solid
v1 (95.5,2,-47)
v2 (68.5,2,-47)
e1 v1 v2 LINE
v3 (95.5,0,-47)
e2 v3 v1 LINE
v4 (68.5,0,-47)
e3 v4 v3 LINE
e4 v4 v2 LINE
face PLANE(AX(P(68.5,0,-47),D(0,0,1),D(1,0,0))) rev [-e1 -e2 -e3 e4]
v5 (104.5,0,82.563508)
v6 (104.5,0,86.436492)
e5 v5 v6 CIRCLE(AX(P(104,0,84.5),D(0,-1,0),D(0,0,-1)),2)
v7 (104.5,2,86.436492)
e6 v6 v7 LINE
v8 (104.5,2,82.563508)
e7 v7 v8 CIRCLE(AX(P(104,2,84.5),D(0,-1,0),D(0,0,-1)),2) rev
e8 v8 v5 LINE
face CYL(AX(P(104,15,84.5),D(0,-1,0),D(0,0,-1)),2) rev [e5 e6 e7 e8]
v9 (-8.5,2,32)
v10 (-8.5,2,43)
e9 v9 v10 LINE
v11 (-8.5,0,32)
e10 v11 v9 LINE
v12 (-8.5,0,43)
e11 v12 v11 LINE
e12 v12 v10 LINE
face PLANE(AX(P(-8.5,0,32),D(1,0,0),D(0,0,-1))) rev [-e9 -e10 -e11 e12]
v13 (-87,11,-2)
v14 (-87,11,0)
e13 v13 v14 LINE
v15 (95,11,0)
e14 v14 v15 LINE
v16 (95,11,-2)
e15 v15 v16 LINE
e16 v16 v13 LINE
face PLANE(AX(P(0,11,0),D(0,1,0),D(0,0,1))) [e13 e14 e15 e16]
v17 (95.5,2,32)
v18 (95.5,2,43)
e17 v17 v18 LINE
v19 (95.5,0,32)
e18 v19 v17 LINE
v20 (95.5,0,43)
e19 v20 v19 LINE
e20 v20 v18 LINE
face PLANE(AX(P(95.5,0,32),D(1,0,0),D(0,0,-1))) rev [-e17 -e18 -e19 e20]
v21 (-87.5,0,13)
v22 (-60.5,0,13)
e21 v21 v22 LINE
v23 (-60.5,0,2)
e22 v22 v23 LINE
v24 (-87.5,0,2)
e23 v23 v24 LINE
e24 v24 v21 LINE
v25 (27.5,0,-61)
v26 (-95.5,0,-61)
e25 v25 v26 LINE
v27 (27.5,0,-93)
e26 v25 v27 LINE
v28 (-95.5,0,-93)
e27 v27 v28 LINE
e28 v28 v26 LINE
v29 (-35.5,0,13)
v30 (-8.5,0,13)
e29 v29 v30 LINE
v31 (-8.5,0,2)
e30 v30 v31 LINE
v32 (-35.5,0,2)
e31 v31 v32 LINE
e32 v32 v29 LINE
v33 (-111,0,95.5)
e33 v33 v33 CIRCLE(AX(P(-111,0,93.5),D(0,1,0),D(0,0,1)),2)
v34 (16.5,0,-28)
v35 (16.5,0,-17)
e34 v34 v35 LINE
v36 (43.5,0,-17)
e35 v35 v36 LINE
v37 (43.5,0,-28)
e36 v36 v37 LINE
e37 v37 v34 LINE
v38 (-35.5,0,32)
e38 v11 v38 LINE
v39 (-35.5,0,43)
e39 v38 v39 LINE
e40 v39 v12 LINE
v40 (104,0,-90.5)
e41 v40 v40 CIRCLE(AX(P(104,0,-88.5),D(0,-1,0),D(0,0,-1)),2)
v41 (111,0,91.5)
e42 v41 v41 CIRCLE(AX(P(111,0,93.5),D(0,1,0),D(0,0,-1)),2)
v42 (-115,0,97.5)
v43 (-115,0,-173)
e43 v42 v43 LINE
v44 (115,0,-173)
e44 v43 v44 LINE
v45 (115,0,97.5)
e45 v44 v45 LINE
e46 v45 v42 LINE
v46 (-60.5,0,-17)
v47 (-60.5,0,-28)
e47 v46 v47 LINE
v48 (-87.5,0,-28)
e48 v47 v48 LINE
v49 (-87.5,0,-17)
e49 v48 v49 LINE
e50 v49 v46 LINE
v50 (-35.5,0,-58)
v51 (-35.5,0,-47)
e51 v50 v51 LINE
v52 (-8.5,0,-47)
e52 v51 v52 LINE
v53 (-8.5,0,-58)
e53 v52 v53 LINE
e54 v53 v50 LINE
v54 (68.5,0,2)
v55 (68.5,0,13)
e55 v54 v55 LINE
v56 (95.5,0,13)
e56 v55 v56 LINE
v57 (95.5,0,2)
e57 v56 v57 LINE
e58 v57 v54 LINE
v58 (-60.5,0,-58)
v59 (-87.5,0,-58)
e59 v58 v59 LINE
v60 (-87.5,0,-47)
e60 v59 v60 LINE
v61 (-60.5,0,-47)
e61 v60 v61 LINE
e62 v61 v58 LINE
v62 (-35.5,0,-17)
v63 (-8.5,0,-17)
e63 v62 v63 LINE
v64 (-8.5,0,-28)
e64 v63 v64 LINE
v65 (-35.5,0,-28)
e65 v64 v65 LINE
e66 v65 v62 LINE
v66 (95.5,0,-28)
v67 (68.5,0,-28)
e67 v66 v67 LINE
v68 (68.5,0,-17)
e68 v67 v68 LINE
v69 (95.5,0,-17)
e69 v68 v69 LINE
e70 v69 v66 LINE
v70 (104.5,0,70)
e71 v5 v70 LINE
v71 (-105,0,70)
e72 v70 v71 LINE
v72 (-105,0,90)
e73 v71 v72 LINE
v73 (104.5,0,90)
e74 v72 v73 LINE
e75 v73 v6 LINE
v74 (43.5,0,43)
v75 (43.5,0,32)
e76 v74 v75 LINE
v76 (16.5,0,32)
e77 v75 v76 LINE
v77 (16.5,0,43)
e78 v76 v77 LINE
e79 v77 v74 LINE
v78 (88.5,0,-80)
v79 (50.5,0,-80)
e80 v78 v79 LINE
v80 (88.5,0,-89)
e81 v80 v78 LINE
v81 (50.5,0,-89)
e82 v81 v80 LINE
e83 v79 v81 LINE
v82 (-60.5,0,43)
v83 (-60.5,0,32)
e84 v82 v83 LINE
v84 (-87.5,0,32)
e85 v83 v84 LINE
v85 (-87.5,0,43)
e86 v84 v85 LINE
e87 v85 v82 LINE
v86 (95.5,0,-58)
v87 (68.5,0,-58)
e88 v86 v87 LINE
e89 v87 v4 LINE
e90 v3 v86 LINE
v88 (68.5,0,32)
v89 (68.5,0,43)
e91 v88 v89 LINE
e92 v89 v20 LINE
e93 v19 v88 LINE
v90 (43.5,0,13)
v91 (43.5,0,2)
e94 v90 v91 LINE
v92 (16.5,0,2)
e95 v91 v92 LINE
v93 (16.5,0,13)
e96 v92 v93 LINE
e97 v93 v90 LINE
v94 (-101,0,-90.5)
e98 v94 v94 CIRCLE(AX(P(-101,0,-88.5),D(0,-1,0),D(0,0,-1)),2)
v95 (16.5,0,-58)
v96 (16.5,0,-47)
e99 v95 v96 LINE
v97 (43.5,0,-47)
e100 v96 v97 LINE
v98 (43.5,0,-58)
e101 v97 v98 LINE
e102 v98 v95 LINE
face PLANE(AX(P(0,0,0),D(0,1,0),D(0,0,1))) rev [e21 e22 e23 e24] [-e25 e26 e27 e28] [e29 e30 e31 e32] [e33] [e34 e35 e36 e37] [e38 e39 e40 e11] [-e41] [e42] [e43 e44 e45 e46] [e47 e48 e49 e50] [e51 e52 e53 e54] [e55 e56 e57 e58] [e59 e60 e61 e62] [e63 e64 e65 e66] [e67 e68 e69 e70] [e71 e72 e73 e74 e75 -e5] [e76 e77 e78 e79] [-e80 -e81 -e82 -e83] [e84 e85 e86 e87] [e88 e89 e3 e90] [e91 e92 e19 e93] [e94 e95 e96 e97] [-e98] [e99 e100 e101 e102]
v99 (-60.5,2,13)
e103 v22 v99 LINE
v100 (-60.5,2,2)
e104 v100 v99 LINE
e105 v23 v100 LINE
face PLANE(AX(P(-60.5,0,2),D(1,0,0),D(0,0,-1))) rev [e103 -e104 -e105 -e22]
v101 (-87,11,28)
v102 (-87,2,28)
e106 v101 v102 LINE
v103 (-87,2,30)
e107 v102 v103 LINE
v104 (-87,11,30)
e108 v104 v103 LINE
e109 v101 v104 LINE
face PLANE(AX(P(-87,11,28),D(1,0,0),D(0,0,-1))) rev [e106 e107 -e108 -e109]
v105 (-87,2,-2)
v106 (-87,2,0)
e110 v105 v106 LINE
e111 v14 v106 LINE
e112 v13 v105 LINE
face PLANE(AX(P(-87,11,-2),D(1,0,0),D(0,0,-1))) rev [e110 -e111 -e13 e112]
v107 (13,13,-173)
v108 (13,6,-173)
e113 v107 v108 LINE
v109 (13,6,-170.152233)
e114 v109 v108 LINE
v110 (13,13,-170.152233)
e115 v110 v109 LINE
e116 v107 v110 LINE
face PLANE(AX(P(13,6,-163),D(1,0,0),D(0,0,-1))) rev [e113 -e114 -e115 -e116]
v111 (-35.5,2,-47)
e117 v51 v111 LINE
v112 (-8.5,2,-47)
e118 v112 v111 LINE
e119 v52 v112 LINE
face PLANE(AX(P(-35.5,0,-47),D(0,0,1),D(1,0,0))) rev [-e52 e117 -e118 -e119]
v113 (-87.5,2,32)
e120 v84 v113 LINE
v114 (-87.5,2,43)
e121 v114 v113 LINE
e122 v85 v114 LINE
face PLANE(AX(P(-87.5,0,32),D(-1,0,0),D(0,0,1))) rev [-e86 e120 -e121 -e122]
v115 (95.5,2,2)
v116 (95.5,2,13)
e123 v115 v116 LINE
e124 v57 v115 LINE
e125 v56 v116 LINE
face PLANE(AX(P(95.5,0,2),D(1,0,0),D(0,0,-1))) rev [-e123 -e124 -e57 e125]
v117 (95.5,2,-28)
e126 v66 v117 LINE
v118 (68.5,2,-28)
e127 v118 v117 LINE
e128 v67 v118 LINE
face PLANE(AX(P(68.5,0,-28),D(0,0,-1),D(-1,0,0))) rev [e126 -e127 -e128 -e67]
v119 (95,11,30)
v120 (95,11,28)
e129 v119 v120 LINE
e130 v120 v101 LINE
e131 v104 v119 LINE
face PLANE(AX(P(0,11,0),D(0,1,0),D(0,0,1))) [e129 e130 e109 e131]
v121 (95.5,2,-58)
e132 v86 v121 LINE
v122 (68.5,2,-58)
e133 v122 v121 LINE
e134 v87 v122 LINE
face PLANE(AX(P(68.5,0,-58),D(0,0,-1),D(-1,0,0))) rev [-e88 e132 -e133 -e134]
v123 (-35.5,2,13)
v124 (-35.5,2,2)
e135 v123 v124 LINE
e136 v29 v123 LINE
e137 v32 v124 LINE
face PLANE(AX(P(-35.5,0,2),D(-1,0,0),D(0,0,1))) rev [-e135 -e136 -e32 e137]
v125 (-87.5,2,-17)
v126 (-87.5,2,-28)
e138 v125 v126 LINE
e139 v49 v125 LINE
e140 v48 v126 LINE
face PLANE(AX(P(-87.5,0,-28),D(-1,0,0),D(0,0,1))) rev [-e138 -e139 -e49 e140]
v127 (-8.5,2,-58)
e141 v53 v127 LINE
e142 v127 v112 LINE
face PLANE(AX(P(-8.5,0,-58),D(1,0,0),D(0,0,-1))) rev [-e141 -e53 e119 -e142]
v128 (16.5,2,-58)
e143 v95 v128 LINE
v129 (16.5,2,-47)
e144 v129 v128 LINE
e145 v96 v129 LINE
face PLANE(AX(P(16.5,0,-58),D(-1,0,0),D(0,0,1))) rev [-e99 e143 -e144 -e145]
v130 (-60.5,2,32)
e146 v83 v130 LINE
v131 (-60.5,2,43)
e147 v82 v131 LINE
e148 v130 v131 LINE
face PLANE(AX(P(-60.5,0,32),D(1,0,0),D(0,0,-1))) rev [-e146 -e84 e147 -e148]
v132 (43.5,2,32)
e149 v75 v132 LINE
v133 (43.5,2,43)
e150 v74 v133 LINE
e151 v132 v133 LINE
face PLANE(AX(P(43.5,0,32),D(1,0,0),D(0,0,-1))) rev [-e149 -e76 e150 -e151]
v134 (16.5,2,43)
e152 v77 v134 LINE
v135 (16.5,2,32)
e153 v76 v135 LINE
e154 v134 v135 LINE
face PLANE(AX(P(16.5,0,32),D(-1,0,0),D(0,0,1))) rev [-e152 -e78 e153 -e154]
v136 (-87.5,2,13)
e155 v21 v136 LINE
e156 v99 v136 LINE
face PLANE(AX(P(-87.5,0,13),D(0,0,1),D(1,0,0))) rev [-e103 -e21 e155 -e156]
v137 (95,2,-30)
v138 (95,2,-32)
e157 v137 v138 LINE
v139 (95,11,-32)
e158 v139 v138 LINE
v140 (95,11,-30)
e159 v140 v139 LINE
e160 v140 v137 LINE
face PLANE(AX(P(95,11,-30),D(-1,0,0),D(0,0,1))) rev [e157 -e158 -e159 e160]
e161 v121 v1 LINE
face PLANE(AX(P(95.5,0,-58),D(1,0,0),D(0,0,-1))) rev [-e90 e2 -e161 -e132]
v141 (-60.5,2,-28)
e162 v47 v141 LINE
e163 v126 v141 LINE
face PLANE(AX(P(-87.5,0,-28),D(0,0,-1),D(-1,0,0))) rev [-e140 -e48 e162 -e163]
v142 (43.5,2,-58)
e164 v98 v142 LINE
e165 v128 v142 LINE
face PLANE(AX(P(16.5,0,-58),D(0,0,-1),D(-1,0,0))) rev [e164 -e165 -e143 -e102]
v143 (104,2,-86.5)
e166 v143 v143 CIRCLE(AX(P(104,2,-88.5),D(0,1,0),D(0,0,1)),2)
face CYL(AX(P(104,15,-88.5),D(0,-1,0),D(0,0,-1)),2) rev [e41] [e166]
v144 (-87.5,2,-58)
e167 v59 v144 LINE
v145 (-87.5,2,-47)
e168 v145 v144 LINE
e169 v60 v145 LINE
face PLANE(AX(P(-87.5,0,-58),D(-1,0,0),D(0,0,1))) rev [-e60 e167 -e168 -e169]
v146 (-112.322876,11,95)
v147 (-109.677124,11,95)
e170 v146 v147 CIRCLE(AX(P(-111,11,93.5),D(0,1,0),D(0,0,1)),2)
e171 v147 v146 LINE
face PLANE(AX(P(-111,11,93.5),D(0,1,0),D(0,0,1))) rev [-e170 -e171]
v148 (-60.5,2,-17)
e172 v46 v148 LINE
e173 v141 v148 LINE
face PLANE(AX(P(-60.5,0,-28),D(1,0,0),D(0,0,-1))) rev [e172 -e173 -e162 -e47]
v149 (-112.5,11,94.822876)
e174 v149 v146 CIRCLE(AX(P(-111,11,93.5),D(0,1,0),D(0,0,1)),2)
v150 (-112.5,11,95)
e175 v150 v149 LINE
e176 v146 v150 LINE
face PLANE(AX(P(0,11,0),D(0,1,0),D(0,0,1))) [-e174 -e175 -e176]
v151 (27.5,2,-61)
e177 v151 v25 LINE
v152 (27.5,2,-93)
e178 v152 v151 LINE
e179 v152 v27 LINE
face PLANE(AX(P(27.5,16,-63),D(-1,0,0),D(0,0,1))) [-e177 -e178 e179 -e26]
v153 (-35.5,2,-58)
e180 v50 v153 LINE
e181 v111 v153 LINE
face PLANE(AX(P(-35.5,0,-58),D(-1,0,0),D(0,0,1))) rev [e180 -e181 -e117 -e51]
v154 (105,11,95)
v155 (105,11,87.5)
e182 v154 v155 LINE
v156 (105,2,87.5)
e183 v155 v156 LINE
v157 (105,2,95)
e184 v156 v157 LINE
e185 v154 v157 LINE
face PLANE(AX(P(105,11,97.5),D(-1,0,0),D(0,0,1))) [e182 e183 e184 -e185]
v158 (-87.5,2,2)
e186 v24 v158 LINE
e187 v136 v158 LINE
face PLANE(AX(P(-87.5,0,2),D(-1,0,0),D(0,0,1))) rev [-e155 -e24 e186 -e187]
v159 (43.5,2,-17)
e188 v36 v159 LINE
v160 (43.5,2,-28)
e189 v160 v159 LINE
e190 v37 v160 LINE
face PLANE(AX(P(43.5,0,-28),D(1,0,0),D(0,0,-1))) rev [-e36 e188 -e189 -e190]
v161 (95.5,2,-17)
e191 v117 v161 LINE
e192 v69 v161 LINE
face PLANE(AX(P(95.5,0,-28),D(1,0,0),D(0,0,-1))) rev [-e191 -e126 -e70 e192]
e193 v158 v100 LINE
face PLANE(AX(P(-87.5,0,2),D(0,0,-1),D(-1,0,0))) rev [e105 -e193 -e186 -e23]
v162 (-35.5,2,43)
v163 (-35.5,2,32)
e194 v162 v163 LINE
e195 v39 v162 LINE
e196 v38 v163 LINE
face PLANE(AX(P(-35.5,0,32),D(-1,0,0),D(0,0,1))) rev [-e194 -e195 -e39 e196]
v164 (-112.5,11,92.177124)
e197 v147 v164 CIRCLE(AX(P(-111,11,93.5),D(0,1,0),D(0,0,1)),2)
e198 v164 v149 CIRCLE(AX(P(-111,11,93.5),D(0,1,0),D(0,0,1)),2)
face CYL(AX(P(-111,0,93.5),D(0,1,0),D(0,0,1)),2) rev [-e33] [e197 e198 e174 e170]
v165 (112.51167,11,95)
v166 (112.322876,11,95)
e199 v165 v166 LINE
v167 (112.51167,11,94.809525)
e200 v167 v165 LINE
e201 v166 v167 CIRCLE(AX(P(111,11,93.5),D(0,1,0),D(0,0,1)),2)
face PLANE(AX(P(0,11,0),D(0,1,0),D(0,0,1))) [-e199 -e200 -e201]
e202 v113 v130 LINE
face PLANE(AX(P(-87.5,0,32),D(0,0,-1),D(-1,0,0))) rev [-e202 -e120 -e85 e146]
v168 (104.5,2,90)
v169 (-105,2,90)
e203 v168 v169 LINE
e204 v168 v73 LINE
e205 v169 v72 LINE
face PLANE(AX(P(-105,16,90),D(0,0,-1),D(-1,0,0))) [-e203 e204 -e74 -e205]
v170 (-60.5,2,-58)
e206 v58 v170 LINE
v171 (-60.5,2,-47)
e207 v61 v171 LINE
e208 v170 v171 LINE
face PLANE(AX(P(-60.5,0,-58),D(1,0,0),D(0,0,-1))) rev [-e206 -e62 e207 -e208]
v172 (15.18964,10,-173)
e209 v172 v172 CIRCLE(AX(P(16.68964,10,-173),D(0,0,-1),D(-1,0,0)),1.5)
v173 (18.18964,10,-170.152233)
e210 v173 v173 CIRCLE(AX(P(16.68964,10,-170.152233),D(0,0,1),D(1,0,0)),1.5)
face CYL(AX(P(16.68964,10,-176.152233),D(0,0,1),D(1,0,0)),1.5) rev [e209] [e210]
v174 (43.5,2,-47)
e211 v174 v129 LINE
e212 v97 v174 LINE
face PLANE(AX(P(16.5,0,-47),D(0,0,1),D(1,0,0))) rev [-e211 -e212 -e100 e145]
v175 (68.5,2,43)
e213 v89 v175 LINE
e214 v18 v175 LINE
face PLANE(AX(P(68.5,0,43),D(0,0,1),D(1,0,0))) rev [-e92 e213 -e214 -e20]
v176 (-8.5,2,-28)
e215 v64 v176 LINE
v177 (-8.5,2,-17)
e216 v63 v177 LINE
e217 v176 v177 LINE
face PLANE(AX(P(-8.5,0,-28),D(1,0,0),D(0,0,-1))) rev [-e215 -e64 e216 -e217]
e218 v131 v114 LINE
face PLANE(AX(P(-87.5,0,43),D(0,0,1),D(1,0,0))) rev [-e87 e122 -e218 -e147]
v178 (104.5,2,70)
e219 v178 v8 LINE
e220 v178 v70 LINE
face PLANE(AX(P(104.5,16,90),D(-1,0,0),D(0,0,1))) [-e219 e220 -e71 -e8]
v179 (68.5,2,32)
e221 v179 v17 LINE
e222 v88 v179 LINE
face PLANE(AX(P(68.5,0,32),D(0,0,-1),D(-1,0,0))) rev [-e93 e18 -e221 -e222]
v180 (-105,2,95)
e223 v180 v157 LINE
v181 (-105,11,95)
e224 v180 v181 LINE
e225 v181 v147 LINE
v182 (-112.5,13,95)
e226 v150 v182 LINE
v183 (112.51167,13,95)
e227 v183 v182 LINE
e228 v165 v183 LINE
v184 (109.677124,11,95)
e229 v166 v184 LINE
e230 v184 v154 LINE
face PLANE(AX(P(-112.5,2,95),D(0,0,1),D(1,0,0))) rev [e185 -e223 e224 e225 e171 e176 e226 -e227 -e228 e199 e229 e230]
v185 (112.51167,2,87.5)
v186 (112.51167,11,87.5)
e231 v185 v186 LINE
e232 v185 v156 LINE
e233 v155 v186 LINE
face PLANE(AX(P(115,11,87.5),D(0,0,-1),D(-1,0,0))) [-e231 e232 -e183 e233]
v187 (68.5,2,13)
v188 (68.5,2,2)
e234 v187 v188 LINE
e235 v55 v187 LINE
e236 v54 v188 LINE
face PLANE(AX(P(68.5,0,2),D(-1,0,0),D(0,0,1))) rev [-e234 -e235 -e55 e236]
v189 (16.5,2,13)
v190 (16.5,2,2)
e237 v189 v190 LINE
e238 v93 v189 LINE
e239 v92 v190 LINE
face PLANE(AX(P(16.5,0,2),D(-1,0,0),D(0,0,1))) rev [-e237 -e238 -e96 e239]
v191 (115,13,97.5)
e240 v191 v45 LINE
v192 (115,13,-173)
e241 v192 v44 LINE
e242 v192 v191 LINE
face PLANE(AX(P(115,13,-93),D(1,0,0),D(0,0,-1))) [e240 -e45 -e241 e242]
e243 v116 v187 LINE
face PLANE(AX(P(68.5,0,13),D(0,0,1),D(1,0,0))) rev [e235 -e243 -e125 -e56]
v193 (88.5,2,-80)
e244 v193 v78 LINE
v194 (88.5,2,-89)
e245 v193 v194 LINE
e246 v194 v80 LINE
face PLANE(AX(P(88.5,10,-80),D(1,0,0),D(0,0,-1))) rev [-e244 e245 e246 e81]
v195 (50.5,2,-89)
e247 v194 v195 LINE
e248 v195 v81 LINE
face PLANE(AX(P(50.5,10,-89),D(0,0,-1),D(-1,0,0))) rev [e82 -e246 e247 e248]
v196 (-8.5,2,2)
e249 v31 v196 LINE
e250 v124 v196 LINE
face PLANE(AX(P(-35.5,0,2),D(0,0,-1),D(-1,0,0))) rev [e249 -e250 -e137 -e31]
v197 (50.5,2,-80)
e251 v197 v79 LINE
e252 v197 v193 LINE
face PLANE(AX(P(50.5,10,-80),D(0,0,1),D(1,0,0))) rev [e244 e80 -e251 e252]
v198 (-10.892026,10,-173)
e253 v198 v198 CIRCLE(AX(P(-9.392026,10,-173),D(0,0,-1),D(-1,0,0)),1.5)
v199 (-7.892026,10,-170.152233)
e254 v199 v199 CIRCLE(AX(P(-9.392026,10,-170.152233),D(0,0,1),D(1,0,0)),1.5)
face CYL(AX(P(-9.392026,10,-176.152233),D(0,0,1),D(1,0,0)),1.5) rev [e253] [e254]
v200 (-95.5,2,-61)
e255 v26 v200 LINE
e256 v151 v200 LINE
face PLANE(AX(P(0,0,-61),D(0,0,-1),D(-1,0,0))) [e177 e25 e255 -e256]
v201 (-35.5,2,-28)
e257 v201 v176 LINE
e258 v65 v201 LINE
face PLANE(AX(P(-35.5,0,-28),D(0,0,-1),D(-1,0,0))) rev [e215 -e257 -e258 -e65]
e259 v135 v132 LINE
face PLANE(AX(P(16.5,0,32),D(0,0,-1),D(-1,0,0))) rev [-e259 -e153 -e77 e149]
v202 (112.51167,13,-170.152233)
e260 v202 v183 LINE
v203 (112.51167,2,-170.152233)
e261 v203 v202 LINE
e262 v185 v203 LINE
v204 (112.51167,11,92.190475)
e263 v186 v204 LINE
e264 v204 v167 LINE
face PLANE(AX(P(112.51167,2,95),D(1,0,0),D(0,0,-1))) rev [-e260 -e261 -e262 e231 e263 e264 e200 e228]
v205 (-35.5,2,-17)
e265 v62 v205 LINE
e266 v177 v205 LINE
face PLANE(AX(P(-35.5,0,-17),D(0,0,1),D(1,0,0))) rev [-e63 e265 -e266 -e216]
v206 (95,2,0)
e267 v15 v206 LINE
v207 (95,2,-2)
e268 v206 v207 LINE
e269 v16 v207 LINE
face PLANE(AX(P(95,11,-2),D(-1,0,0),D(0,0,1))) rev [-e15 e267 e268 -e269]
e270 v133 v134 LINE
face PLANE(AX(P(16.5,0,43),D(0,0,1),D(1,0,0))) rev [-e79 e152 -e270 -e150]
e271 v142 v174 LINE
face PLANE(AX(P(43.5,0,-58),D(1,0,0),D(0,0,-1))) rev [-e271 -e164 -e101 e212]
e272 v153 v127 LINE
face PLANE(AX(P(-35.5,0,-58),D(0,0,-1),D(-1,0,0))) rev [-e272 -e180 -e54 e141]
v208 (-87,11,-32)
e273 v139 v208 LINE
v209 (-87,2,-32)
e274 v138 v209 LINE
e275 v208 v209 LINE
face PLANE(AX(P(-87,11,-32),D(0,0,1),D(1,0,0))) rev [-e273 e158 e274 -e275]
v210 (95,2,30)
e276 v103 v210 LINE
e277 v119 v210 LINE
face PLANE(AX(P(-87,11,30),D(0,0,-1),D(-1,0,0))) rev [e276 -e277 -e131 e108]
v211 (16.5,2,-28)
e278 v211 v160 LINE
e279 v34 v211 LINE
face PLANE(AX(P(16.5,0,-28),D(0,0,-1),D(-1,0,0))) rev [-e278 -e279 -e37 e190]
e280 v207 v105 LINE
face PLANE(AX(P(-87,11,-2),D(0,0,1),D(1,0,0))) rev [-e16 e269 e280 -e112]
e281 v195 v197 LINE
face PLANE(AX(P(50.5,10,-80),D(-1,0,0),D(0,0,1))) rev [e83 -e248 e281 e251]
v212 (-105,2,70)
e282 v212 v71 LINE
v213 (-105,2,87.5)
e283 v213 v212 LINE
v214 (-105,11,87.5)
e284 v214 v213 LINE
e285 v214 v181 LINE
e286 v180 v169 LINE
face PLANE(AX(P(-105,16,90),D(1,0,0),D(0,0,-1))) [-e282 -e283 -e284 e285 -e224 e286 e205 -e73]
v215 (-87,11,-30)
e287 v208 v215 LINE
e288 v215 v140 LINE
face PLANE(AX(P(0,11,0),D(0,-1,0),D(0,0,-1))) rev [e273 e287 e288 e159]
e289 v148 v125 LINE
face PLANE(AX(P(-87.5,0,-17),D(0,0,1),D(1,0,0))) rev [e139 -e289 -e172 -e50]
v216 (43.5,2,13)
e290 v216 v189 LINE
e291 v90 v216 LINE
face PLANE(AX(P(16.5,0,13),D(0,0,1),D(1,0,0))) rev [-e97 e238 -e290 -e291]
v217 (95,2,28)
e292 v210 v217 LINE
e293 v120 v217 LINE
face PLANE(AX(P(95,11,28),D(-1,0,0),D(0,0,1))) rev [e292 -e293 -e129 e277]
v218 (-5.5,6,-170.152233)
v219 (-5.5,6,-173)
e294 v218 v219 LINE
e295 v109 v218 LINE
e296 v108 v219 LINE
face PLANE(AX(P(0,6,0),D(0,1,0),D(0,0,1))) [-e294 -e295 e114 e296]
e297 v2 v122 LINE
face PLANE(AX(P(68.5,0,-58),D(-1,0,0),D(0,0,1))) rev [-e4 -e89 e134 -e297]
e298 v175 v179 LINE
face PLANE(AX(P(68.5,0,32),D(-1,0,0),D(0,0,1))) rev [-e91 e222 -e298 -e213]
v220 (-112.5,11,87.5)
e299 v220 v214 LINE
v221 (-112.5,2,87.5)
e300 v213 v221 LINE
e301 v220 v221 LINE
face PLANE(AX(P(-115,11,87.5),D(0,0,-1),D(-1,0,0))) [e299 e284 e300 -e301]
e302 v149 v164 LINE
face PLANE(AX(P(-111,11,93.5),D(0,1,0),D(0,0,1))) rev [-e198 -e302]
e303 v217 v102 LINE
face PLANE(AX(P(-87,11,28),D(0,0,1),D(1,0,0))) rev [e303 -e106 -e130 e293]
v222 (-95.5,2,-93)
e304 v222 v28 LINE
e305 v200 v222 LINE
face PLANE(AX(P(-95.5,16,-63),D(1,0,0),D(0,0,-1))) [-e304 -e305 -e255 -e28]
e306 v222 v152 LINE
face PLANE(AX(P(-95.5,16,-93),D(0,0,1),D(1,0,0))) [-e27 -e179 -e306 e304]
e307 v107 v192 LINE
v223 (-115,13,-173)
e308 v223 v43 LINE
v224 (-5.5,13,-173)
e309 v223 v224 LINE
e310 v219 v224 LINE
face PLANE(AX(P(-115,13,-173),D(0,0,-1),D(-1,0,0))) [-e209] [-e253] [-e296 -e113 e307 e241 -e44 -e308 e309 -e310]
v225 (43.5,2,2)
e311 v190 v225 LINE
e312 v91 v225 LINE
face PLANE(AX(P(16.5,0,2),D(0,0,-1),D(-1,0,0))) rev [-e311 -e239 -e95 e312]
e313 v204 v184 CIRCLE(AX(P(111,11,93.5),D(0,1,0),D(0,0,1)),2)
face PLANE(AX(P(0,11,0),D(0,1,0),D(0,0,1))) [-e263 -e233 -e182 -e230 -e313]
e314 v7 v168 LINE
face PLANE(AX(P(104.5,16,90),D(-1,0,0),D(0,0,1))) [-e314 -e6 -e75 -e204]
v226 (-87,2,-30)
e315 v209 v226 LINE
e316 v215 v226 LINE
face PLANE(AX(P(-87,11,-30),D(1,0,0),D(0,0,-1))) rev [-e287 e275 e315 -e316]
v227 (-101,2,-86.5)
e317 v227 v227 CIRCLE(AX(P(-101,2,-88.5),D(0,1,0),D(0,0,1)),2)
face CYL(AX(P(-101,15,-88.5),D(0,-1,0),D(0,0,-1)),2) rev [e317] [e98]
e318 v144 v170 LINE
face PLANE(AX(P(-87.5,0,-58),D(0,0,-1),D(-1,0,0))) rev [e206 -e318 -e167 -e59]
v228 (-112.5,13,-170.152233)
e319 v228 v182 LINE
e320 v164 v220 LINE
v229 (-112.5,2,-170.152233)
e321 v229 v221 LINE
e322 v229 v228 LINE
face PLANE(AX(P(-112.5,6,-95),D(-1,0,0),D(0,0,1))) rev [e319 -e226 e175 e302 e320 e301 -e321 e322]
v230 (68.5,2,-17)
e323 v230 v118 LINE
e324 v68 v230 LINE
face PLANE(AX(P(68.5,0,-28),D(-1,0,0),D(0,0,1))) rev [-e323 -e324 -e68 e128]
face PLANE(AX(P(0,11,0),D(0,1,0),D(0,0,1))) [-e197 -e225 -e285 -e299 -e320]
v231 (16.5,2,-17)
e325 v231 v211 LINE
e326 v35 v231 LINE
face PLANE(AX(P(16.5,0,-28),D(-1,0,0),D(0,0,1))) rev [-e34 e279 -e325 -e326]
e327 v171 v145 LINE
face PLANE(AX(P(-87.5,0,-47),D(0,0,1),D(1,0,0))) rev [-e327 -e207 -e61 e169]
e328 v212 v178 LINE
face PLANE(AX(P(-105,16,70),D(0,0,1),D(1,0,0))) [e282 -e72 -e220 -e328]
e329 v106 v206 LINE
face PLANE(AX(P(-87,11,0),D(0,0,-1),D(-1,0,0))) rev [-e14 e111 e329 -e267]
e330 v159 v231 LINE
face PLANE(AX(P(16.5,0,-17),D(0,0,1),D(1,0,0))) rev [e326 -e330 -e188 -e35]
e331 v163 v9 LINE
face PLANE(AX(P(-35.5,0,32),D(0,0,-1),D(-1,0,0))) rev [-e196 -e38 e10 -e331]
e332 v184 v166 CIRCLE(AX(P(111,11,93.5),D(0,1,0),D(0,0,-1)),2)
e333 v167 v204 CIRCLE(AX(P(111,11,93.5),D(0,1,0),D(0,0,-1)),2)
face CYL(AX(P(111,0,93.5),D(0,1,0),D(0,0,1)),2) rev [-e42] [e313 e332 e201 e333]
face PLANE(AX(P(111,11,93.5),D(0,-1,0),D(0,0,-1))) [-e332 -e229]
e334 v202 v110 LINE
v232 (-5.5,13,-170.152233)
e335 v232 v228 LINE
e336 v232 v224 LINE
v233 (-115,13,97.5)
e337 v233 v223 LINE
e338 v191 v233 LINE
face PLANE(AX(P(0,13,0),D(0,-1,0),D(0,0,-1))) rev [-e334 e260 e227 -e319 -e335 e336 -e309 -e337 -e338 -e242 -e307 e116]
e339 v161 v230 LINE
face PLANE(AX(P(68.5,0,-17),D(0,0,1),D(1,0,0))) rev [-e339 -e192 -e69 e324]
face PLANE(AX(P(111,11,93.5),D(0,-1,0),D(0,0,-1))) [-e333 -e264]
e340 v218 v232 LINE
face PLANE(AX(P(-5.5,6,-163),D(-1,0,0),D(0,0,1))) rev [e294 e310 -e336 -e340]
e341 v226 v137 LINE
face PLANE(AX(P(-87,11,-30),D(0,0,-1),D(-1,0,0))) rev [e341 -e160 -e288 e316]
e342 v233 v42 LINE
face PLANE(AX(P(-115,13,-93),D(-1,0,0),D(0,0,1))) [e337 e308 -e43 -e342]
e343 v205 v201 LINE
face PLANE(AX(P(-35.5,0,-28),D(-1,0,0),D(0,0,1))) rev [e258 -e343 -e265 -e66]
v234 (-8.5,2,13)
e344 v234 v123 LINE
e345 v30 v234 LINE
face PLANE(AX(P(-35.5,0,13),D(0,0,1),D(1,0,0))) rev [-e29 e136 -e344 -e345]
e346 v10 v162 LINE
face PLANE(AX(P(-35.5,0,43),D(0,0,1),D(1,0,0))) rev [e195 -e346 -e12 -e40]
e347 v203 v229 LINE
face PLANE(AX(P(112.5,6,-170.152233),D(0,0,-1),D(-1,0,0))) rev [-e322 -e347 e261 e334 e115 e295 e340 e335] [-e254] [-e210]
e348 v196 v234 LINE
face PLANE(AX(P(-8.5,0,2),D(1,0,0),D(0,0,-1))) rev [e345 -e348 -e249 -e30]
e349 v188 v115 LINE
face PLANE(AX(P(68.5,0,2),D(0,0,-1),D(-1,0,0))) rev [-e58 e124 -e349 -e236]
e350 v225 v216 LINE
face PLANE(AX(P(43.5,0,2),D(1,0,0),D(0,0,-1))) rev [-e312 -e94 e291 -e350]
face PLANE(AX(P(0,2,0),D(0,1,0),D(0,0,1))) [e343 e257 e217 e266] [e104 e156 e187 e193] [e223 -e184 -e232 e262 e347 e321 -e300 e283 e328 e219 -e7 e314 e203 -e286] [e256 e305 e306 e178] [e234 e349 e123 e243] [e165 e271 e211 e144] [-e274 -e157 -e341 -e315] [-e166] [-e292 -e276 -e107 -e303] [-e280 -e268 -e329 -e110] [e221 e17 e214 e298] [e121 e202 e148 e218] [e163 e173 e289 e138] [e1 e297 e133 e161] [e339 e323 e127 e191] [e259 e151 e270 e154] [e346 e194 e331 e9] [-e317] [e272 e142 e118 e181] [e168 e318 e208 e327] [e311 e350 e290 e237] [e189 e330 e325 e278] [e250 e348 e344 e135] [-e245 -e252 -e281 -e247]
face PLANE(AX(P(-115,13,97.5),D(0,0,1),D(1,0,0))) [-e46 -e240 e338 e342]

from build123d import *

# Parameters (mm, degrees)
ESQUISSE3_W              = 225
ESQUISSE3_H              = 190
ESQUISSE3_W_2            = 209.5
ESQUISSE3_H_2            = 20
ESQUISSE3_W_3            = 123
ESQUISSE3_H_3            = 30
BLOC_COQUE_DEPTH         = 16
ESQUISSE5_W              = 27
ESQUISSE5_H              = 11
TROU_CARTOUCHE_DEPTH     = 149.112288484
COQUE5_START             = -61
COQUE5_OUTLINE_W         = 13
COQUE5_OUTLINE_H         = 14
COQUE5_OUTLINE_W_2       = 21
COQUE5_DEPTH             = 129
COQUE5_START_2           = -93
COQUE5_2_OUTLINE_W       = 81
COQUE5_2_OUTLINE_H       = 14
COQUE5_2_OUTLINE_W_2     = 13
COQUE5_2_DEPTH           = 33
COQUE5_START_3           = 45
COQUE5_3_OUTLINE_W       = 31
COQUE5_3_OUTLINE_H       = 14
COQUE5_3_DEPTH           = 23
COQUE5_START_4           = -45
COQUE5_4_OUTLINE_W       = 31
COQUE5_4_OUTLINE_H       = 14
COQUE5_4_DEPTH           = 15
COQUE5_START_5           = -15
COQUE5_5_OUTLINE_W       = 31
COQUE5_5_OUTLINE_H       = 14
COQUE5_5_DEPTH           = 15
COQUE5_START_6           = 15
COQUE5_6_OUTLINE_W       = 31
COQUE5_6_OUTLINE_H       = 14
COQUE5_6_DEPTH           = 15
COQUE5_START_7           = 92
COQUE5_7_OUTLINE_W       = 221
COQUE5_7_OUTLINE_H       = 14
COQUE5_7_DEPTH           = 1
COQUE5_START_8           = 68
COQUE5_8_OUTLINE_W       = 4
COQUE5_8_OUTLINE_H       = 14
COQUE5_8_OUTLINE_W_2     = 3.5
COQUE5_8_DEPTH           = 24
COQUE5_9_OUTLINE_W       = 15
COQUE5_9_OUTLINE_H       = 14
COQUE5_9_OUTLINE_W_2     = 31
COQUE5_9_DEPTH           = 1
ESQUISSE6_W              = 138
ESQUISSE6_H              = 183.5
LOGEMENT_CARTE_DEPTH     = 6
ESQUISSE10_R             = 2
ENL_V_MAT_EXTRU_2_DEPTH  = 15
ESQUISSE12_W             = 100
ESQUISSE12_H             = 186
ENL_V_MAT_EXTRU_4_DEPTH  = 6
ESQUISSE13_W             = 123
ESQUISSE13_H             = 10
ENL_V_MAT_EXTRU_5_DEPTH  = 2
ESQUISSE14_W             = 200
ESQUISSE14_H             = 108.975087814
ENL_V_MAT_EXTRU_6_DEPTH  = 8
ESQUISSE16_W             = 38
ESQUISSE16_H             = 9
ENL_V_MAT_EXTRU_7_DEPTH  = 10
ESQUISSE17_W             = 230
ESQUISSE17_H             = 195
ESQUISSE17_W_2           = 225
ESQUISSE17_H_2           = 190
BOSS_EXTRU_2_DEPTH       = 13
ESQUISSE18_W             = 230
ESQUISSE18_H             = 4.5
ENL_V_MAT_EXTRU_8_DEPTH  = 152.328285525
ESQUISSE20_W             = 230
ESQUISSE20_H             = 80
BOSS_EXTRU_3_DEPTH       = 13
ESQUISSE21_W             = 225
ESQUISSE21_H             = 75.152232857
ENL_V_MAT_EXTRU_9_DEPTH  = 7
ESQUISSE25_W             = 18.5
ESQUISSE25_H             = 9.5
ENL_V_MAT_EXTRU_11_DEPTH = 10
ESQUISSE29_R             = 1.5
ENL_V_MAT_EXTRU_14_DEPTH = 6
ESQUISSE36_W             = 225.011669516
ESQUISSE36_H             = 265.152232857
ENL_V_MAT_EXTRU_18_DEPTH = 14
ESQUISSE30_W             = 10
ESQUISSE30_H             = 10
BOSS_EXTRU_4_DEPTH       = 11
ESQUISSE33_R             = 2
ENL_V_MAT_EXTRU_16_DEPTH = 209.026440627
ESQUISSE37_W             = 182
ESQUISSE37_H             = 2
BOSS_EXTRU_6_DEPTH       = 9


# Read off the part's stored shape, not the designer's step: Coque5
with BuildPart() as part:
    # Esquisse3 → Bloc coque (new body)
    with BuildSketch(Plane(origin=(0, 0, 0), x_dir=(1, 0, 0), z_dir=(0, 1, 0))):
        Rectangle(ESQUISSE3_W, ESQUISSE3_H)
        with Locations((-0.25, -80)):
            Rectangle(ESQUISSE3_W_2, ESQUISSE3_H_2, mode=Mode.SUBTRACT)
        with Locations((-34, 78)):
            Rectangle(ESQUISSE3_W_3, ESQUISSE3_H_3, mode=Mode.SUBTRACT)
    extrude(amount=BLOC_COQUE_DEPTH)

    # Esquisse5 → Trou cartouche (cut, through all)
    with BuildSketch(Plane(origin=(0, 16, 0), x_dir=(1, 0, 0), z_dir=(0, 1, 0))):
        with Locations((-74, 52.5)):
            Rectangle(ESQUISSE5_W, ESQUISSE5_H)
        with Locations((-22, 52.5)):
            Rectangle(ESQUISSE5_W, ESQUISSE5_H)
        with Locations((30, 52.5)):
            Rectangle(ESQUISSE5_W, ESQUISSE5_H)
        with Locations((82, 52.5)):
            Rectangle(ESQUISSE5_W, ESQUISSE5_H)
        with Locations((-22, 22.5)):
            Rectangle(ESQUISSE5_W, ESQUISSE5_H)
        with Locations((30, 22.5)):
            Rectangle(ESQUISSE5_W, ESQUISSE5_H)
        with Locations((82, 22.5)):
            Rectangle(ESQUISSE5_W, ESQUISSE5_H)
        with Locations((-22, -7.5)):
            Rectangle(ESQUISSE5_W, ESQUISSE5_H)
        with Locations((30, -7.5)):
            Rectangle(ESQUISSE5_W, ESQUISSE5_H)
        with Locations((82, -7.5)):
            Rectangle(ESQUISSE5_W, ESQUISSE5_H)
        with Locations((-22, -37.5)):
            Rectangle(ESQUISSE5_W, ESQUISSE5_H)
        with Locations((30, -37.5)):
            Rectangle(ESQUISSE5_W, ESQUISSE5_H)
        with Locations((82, -37.5)):
            Rectangle(ESQUISSE5_W, ESQUISSE5_H)
        with Locations((-74, 22.5)):
            Rectangle(ESQUISSE5_W, ESQUISSE5_H)
        with Locations((-74, -7.5)):
            Rectangle(ESQUISSE5_W, ESQUISSE5_H)
        with Locations((-74, -37.5)):
            Rectangle(ESQUISSE5_W, ESQUISSE5_H)
    extrude(amount=-TROU_CARTOUCHE_DEPTH, mode=Mode.SUBTRACT)

    # Coque5 outline → Coque5 (cut)
    with BuildSketch(Plane.XY.offset(COQUE5_START)):
        with Locations((104, 9)):
            Rectangle(COQUE5_OUTLINE_W, COQUE5_OUTLINE_H)
        with Locations((56, 9)):
            Rectangle(COQUE5_OUTLINE_W_2, COQUE5_OUTLINE_H)
        with Locations((4, 9)):
            Rectangle(COQUE5_OUTLINE_W_2, COQUE5_OUTLINE_H)
        with Locations((-48, 9)):
            Rectangle(COQUE5_OUTLINE_W_2, COQUE5_OUTLINE_H)
        with Locations((-100, 9)):
            Rectangle(COQUE5_OUTLINE_W_2, COQUE5_OUTLINE_H)
    extrude(amount=COQUE5_DEPTH, mode=Mode.SUBTRACT)

    # Coque5 2 outline → Coque5 2 (cut)
    with BuildSketch(Plane.XY.offset(COQUE5_START_2)):
        with Locations((70, 9)):
            Rectangle(COQUE5_2_OUTLINE_W, COQUE5_2_OUTLINE_H)
        with Locations((-104, 9)):
            Rectangle(COQUE5_2_OUTLINE_W_2, COQUE5_2_OUTLINE_H)
    extrude(amount=COQUE5_2_DEPTH, mode=Mode.SUBTRACT)

    # Coque5 3 outline → Coque5 3 (cut)
    with BuildSketch(Plane.XY.offset(COQUE5_START_3)):
        with Locations((82, 9)):
            Rectangle(COQUE5_3_OUTLINE_W, COQUE5_3_OUTLINE_H)
        with Locations((30, 9)):
            Rectangle(COQUE5_3_OUTLINE_W, COQUE5_3_OUTLINE_H)
        with Locations((-22, 9)):
            Rectangle(COQUE5_3_OUTLINE_W, COQUE5_3_OUTLINE_H)
        with Locations((-74, 9)):
            Rectangle(COQUE5_3_OUTLINE_W, COQUE5_3_OUTLINE_H)
    extrude(amount=COQUE5_3_DEPTH, mode=Mode.SUBTRACT)

    # Coque5 4 outline → Coque5 4 (cut)
    with BuildSketch(Plane.XY.offset(COQUE5_START_4)):
        with Locations((82, 9)):
            Rectangle(COQUE5_4_OUTLINE_W, COQUE5_4_OUTLINE_H)
        with Locations((30, 9)):
            Rectangle(COQUE5_4_OUTLINE_W, COQUE5_4_OUTLINE_H)
        with Locations((-22, 9)):
            Rectangle(COQUE5_4_OUTLINE_W, COQUE5_4_OUTLINE_H)
        with Locations((-74, 9)):
            Rectangle(COQUE5_4_OUTLINE_W, COQUE5_4_OUTLINE_H)
    extrude(amount=COQUE5_4_DEPTH, mode=Mode.SUBTRACT)

    # Coque5 5 outline → Coque5 5 (cut)
    with BuildSketch(Plane.XY.offset(COQUE5_START_5)):
        with Locations((82, 9)):
            Rectangle(COQUE5_5_OUTLINE_W, COQUE5_5_OUTLINE_H)
        with Locations((30, 9)):
            Rectangle(COQUE5_5_OUTLINE_W, COQUE5_5_OUTLINE_H)
        with Locations((-22, 9)):
            Rectangle(COQUE5_5_OUTLINE_W, COQUE5_5_OUTLINE_H)
        with Locations((-74, 9)):
            Rectangle(COQUE5_5_OUTLINE_W, COQUE5_5_OUTLINE_H)
    extrude(amount=COQUE5_5_DEPTH, mode=Mode.SUBTRACT)

    # Coque5 6 outline → Coque5 6 (cut)
    with BuildSketch(Plane.XY.offset(COQUE5_START_6)):
        with Locations((82, 9)):
            Rectangle(COQUE5_6_OUTLINE_W, COQUE5_6_OUTLINE_H)
        with Locations((30, 9)):
            Rectangle(COQUE5_6_OUTLINE_W, COQUE5_6_OUTLINE_H)
        with Locations((-22, 9)):
            Rectangle(COQUE5_6_OUTLINE_W, COQUE5_6_OUTLINE_H)
        with Locations((-74, 9)):
            Rectangle(COQUE5_6_OUTLINE_W, COQUE5_6_OUTLINE_H)
    extrude(amount=COQUE5_6_DEPTH, mode=Mode.SUBTRACT)

    # Coque5 7 outline → Coque5 7 (cut)
    with BuildSketch(Plane.XY.offset(COQUE5_START_7)):
        with Locations((0, 9)):
            Rectangle(COQUE5_7_OUTLINE_W, COQUE5_7_OUTLINE_H)
    extrude(amount=COQUE5_7_DEPTH, mode=Mode.SUBTRACT)

    # Coque5 8 outline → Coque5 8 (cut)
    with BuildSketch(Plane.XY.offset(COQUE5_START_8)):
        with Locations((108.5, 9)):
            Rectangle(COQUE5_8_OUTLINE_W, COQUE5_8_OUTLINE_H)
        with Locations((-108.75, 9)):
            Rectangle(COQUE5_8_OUTLINE_W_2, COQUE5_8_OUTLINE_H)
    extrude(amount=COQUE5_8_DEPTH, mode=Mode.SUBTRACT)

    # Coque5 9 outline → Coque5 9 (cut)
    with BuildSketch(Plane.XY.offset(COQUE5_START)):
        with Locations((22, 9)):
            Rectangle(COQUE5_9_OUTLINE_W, COQUE5_9_OUTLINE_H)
        with Locations((-22, 9)):
            Rectangle(COQUE5_9_OUTLINE_W_2, COQUE5_9_OUTLINE_H)
        with Locations((-74, 9)):
            Rectangle(COQUE5_9_OUTLINE_W_2, COQUE5_9_OUTLINE_H)
    extrude(amount=COQUE5_9_DEPTH, mode=Mode.SUBTRACT)

    # Esquisse6 → Logement carte (cut)
    with BuildSketch(Plane(origin=(0, 16, 0), x_dir=(1, 0, 0), z_dir=(0, 1, 0))):
        with Locations((-41.5, 1.25)):
            Rectangle(ESQUISSE6_W, ESQUISSE6_H)
    extrude(amount=-LOGEMENT_CARTE_DEPTH, mode=Mode.SUBTRACT)

    # Esquisse10 → Enlèv. mat.-Extru.2 (cut)
    with BuildSketch(Plane(origin=(0, 0, 0), x_dir=(-1, 0, 0), z_dir=(0, -1, 0))):
        with Locations(Location((-104, 88.5, 0), (0, 0, 90))):
            Circle(ESQUISSE10_R)
        with Locations(Location((101, 88.5, 0), (0, 0, 90))):
            Circle(ESQUISSE10_R)
        with Locations((-104, -84.5)):
            Circle(ESQUISSE10_R)
    extrude(amount=-ENL_V_MAT_EXTRU_2_DEPTH, mode=Mode.SUBTRACT)

    # Esquisse12 → Enlèv. mat.-Extru.4 (cut)
    with BuildSketch(Plane(origin=(0, 16, 0), x_dir=(1, 0, 0), z_dir=(0, 1, 0))):
        with Locations((60.5, 0)):
            Rectangle(ESQUISSE12_W, ESQUISSE12_H)
    extrude(amount=-ENL_V_MAT_EXTRU_4_DEPTH, mode=Mode.SUBTRACT)

    # Esquisse13 → Enlèv. mat.-Extru.5 (cut)
    with BuildSketch(Plane(origin=(0, 0, -63), x_dir=(-1, 0, 0), z_dir=(0, 0, -1))):
        with Locations((34, 5)):
            Rectangle(ESQUISSE13_W, ESQUISSE13_H)
    extrude(amount=-ENL_V_MAT_EXTRU_5_DEPTH, mode=Mode.SUBTRACT)

    # Esquisse14 → Enlèv. mat.-Extru.6 (cut)
    with BuildSketch(Plane(origin=(0, 10, 0), x_dir=(1, 0, 0), z_dir=(0, 1, 0))):
        with Locations((4.5, 6.512456093)):
            Rectangle(ESQUISSE14_W, ESQUISSE14_H)
    extrude(amount=-ENL_V_MAT_EXTRU_6_DEPTH, mode=Mode.SUBTRACT)

    # Esquisse16 → Enlèv. mat.-Extru.7 (cut)
    with BuildSketch(Plane.XZ):
        with Locations((69.5, -84.5)):
            Rectangle(ESQUISSE16_W, ESQUISSE16_H)
    extrude(amount=-ENL_V_MAT_EXTRU_7_DEPTH, mode=Mode.SUBTRACT)


with BuildPart() as body_2:
    # Esquisse17 → Boss.-Extru.2 (new body)
    with BuildSketch(Plane.XZ):
        Rectangle(ESQUISSE17_W, ESQUISSE17_H)
        Rectangle(ESQUISSE17_W_2, ESQUISSE17_H_2, mode=Mode.SUBTRACT)
    extrude(amount=-BOSS_EXTRU_2_DEPTH)


with BuildPart() as enl_v_mat_extru_8_tool:
    # Esquisse18 → Enlèv. mat.-Extru.8 (new, through all)
    with BuildSketch(Plane(origin=(0, 13, 0), x_dir=(1, 0, 0), z_dir=(0, 1, 0))):
        with Locations((0, 95.25)):
            Rectangle(ESQUISSE18_W, ESQUISSE18_H)
    extrude(amount=-ENL_V_MAT_EXTRU_8_DEPTH)


with BuildPart() as part_1:
    add(part.part)

    # Enlèv. mat.-Extru.8: cut by enl_v_mat_extru_8_tool
    add(enl_v_mat_extru_8_tool.part, mode=Mode.SUBTRACT)



with BuildPart() as body_2_1:
    add(body_2.part)

    # Enlèv. mat.-Extru.8: cut by enl_v_mat_extru_8_tool
    add(enl_v_mat_extru_8_tool.part, mode=Mode.SUBTRACT)


with BuildPart() as part_2:
    add(part_1.part)

    add(body_2_1.part)  # Boss.-Extru.3 merges body 2
    # Esquisse20 → Boss.-Extru.3 (add)
    with BuildSketch(Plane.XZ):
        with Locations((0, -133)):
            Rectangle(ESQUISSE20_W, ESQUISSE20_H)
    extrude(amount=-BOSS_EXTRU_3_DEPTH)

    # Esquisse21 → Enlèv. mat.-Extru.9 (cut)
    with BuildSketch(Plane(origin=(0, 13, 0), x_dir=(1, 0, 0), z_dir=(0, 1, 0))):
        with Locations((0, 132.576116429)):
            Rectangle(ESQUISSE21_W, ESQUISSE21_H)
    extrude(amount=-ENL_V_MAT_EXTRU_9_DEPTH, mode=Mode.SUBTRACT)

    # Esquisse25 → Enlèv. mat.-Extru.11 (cut)
    with BuildSketch(Plane(origin=(0, 0, -173), x_dir=(-1, 0, 0), z_dir=(0, 0, -1))):
        with Locations((-3.75, 10.75)):
            Rectangle(ESQUISSE25_W, ESQUISSE25_H)
    extrude(amount=-ENL_V_MAT_EXTRU_11_DEPTH, mode=Mode.SUBTRACT)

    # Esquisse29 → Enlèv. mat.-Extru.14 (cut)
    with BuildSketch(Plane.XY.offset(-170.152232857)):
        with Locations((16.689639813, 10)):
            Circle(ESQUISSE29_R)
        with Locations((-9.392025581, 10)):
            Circle(ESQUISSE29_R)
    extrude(amount=-ENL_V_MAT_EXTRU_14_DEPTH, mode=Mode.SUBTRACT)

    # Esquisse36 → Enlèv. mat.-Extru.18 (cut)
    with BuildSketch(Plane(origin=(0, 16, 0), x_dir=(1, 0, 0), z_dir=(0, 1, 0))):
        with Locations((0.005834758, 37.576116429)):
            Rectangle(ESQUISSE36_W, ESQUISSE36_H)
    extrude(amount=-ENL_V_MAT_EXTRU_18_DEPTH, mode=Mode.SUBTRACT)

    # Esquisse30 → Boss.-Extru.4 (add)
    with BuildSketch(Plane.XZ):
        with Locations((110, 92.5)):
            Rectangle(ESQUISSE30_W, ESQUISSE30_H)
        with Locations((-110, 92.5)):
            Rectangle(ESQUISSE30_W, ESQUISSE30_H)
    extrude(amount=-BOSS_EXTRU_4_DEPTH)

    # Esquisse33 → Enlèv. mat.-Extru.16 (cut, through all)
    with BuildSketch(Plane(origin=(0, 11, 0), x_dir=(1, 0, 0), z_dir=(0, 1, 0))):
        with Locations(Location((-111, -93.5, 0), (0, 0, 270))):
            Circle(ESQUISSE33_R)
        with Locations(Location((111, -93.5, 0), (0, 0, 311.409622109))):
            Circle(ESQUISSE33_R)
    extrude(amount=-ENL_V_MAT_EXTRU_16_DEPTH, mode=Mode.SUBTRACT)

    # Esquisse37 → Boss.-Extru.6 (add)
    with BuildSketch(Plane(origin=(0, 2, 0), x_dir=(1, 0, 0), z_dir=(0, 1, 0))):
        with Locations((4, -29)):
            Rectangle(ESQUISSE37_W, ESQUISSE37_H)
        with Locations((4, 1)):
            Rectangle(ESQUISSE37_W, ESQUISSE37_H)
        with Locations((4, 31)):
            Rectangle(ESQUISSE37_W, ESQUISSE37_H)
    extrude(amount=BOSS_EXTRU_6_DEPTH)


solid = part_2.part
